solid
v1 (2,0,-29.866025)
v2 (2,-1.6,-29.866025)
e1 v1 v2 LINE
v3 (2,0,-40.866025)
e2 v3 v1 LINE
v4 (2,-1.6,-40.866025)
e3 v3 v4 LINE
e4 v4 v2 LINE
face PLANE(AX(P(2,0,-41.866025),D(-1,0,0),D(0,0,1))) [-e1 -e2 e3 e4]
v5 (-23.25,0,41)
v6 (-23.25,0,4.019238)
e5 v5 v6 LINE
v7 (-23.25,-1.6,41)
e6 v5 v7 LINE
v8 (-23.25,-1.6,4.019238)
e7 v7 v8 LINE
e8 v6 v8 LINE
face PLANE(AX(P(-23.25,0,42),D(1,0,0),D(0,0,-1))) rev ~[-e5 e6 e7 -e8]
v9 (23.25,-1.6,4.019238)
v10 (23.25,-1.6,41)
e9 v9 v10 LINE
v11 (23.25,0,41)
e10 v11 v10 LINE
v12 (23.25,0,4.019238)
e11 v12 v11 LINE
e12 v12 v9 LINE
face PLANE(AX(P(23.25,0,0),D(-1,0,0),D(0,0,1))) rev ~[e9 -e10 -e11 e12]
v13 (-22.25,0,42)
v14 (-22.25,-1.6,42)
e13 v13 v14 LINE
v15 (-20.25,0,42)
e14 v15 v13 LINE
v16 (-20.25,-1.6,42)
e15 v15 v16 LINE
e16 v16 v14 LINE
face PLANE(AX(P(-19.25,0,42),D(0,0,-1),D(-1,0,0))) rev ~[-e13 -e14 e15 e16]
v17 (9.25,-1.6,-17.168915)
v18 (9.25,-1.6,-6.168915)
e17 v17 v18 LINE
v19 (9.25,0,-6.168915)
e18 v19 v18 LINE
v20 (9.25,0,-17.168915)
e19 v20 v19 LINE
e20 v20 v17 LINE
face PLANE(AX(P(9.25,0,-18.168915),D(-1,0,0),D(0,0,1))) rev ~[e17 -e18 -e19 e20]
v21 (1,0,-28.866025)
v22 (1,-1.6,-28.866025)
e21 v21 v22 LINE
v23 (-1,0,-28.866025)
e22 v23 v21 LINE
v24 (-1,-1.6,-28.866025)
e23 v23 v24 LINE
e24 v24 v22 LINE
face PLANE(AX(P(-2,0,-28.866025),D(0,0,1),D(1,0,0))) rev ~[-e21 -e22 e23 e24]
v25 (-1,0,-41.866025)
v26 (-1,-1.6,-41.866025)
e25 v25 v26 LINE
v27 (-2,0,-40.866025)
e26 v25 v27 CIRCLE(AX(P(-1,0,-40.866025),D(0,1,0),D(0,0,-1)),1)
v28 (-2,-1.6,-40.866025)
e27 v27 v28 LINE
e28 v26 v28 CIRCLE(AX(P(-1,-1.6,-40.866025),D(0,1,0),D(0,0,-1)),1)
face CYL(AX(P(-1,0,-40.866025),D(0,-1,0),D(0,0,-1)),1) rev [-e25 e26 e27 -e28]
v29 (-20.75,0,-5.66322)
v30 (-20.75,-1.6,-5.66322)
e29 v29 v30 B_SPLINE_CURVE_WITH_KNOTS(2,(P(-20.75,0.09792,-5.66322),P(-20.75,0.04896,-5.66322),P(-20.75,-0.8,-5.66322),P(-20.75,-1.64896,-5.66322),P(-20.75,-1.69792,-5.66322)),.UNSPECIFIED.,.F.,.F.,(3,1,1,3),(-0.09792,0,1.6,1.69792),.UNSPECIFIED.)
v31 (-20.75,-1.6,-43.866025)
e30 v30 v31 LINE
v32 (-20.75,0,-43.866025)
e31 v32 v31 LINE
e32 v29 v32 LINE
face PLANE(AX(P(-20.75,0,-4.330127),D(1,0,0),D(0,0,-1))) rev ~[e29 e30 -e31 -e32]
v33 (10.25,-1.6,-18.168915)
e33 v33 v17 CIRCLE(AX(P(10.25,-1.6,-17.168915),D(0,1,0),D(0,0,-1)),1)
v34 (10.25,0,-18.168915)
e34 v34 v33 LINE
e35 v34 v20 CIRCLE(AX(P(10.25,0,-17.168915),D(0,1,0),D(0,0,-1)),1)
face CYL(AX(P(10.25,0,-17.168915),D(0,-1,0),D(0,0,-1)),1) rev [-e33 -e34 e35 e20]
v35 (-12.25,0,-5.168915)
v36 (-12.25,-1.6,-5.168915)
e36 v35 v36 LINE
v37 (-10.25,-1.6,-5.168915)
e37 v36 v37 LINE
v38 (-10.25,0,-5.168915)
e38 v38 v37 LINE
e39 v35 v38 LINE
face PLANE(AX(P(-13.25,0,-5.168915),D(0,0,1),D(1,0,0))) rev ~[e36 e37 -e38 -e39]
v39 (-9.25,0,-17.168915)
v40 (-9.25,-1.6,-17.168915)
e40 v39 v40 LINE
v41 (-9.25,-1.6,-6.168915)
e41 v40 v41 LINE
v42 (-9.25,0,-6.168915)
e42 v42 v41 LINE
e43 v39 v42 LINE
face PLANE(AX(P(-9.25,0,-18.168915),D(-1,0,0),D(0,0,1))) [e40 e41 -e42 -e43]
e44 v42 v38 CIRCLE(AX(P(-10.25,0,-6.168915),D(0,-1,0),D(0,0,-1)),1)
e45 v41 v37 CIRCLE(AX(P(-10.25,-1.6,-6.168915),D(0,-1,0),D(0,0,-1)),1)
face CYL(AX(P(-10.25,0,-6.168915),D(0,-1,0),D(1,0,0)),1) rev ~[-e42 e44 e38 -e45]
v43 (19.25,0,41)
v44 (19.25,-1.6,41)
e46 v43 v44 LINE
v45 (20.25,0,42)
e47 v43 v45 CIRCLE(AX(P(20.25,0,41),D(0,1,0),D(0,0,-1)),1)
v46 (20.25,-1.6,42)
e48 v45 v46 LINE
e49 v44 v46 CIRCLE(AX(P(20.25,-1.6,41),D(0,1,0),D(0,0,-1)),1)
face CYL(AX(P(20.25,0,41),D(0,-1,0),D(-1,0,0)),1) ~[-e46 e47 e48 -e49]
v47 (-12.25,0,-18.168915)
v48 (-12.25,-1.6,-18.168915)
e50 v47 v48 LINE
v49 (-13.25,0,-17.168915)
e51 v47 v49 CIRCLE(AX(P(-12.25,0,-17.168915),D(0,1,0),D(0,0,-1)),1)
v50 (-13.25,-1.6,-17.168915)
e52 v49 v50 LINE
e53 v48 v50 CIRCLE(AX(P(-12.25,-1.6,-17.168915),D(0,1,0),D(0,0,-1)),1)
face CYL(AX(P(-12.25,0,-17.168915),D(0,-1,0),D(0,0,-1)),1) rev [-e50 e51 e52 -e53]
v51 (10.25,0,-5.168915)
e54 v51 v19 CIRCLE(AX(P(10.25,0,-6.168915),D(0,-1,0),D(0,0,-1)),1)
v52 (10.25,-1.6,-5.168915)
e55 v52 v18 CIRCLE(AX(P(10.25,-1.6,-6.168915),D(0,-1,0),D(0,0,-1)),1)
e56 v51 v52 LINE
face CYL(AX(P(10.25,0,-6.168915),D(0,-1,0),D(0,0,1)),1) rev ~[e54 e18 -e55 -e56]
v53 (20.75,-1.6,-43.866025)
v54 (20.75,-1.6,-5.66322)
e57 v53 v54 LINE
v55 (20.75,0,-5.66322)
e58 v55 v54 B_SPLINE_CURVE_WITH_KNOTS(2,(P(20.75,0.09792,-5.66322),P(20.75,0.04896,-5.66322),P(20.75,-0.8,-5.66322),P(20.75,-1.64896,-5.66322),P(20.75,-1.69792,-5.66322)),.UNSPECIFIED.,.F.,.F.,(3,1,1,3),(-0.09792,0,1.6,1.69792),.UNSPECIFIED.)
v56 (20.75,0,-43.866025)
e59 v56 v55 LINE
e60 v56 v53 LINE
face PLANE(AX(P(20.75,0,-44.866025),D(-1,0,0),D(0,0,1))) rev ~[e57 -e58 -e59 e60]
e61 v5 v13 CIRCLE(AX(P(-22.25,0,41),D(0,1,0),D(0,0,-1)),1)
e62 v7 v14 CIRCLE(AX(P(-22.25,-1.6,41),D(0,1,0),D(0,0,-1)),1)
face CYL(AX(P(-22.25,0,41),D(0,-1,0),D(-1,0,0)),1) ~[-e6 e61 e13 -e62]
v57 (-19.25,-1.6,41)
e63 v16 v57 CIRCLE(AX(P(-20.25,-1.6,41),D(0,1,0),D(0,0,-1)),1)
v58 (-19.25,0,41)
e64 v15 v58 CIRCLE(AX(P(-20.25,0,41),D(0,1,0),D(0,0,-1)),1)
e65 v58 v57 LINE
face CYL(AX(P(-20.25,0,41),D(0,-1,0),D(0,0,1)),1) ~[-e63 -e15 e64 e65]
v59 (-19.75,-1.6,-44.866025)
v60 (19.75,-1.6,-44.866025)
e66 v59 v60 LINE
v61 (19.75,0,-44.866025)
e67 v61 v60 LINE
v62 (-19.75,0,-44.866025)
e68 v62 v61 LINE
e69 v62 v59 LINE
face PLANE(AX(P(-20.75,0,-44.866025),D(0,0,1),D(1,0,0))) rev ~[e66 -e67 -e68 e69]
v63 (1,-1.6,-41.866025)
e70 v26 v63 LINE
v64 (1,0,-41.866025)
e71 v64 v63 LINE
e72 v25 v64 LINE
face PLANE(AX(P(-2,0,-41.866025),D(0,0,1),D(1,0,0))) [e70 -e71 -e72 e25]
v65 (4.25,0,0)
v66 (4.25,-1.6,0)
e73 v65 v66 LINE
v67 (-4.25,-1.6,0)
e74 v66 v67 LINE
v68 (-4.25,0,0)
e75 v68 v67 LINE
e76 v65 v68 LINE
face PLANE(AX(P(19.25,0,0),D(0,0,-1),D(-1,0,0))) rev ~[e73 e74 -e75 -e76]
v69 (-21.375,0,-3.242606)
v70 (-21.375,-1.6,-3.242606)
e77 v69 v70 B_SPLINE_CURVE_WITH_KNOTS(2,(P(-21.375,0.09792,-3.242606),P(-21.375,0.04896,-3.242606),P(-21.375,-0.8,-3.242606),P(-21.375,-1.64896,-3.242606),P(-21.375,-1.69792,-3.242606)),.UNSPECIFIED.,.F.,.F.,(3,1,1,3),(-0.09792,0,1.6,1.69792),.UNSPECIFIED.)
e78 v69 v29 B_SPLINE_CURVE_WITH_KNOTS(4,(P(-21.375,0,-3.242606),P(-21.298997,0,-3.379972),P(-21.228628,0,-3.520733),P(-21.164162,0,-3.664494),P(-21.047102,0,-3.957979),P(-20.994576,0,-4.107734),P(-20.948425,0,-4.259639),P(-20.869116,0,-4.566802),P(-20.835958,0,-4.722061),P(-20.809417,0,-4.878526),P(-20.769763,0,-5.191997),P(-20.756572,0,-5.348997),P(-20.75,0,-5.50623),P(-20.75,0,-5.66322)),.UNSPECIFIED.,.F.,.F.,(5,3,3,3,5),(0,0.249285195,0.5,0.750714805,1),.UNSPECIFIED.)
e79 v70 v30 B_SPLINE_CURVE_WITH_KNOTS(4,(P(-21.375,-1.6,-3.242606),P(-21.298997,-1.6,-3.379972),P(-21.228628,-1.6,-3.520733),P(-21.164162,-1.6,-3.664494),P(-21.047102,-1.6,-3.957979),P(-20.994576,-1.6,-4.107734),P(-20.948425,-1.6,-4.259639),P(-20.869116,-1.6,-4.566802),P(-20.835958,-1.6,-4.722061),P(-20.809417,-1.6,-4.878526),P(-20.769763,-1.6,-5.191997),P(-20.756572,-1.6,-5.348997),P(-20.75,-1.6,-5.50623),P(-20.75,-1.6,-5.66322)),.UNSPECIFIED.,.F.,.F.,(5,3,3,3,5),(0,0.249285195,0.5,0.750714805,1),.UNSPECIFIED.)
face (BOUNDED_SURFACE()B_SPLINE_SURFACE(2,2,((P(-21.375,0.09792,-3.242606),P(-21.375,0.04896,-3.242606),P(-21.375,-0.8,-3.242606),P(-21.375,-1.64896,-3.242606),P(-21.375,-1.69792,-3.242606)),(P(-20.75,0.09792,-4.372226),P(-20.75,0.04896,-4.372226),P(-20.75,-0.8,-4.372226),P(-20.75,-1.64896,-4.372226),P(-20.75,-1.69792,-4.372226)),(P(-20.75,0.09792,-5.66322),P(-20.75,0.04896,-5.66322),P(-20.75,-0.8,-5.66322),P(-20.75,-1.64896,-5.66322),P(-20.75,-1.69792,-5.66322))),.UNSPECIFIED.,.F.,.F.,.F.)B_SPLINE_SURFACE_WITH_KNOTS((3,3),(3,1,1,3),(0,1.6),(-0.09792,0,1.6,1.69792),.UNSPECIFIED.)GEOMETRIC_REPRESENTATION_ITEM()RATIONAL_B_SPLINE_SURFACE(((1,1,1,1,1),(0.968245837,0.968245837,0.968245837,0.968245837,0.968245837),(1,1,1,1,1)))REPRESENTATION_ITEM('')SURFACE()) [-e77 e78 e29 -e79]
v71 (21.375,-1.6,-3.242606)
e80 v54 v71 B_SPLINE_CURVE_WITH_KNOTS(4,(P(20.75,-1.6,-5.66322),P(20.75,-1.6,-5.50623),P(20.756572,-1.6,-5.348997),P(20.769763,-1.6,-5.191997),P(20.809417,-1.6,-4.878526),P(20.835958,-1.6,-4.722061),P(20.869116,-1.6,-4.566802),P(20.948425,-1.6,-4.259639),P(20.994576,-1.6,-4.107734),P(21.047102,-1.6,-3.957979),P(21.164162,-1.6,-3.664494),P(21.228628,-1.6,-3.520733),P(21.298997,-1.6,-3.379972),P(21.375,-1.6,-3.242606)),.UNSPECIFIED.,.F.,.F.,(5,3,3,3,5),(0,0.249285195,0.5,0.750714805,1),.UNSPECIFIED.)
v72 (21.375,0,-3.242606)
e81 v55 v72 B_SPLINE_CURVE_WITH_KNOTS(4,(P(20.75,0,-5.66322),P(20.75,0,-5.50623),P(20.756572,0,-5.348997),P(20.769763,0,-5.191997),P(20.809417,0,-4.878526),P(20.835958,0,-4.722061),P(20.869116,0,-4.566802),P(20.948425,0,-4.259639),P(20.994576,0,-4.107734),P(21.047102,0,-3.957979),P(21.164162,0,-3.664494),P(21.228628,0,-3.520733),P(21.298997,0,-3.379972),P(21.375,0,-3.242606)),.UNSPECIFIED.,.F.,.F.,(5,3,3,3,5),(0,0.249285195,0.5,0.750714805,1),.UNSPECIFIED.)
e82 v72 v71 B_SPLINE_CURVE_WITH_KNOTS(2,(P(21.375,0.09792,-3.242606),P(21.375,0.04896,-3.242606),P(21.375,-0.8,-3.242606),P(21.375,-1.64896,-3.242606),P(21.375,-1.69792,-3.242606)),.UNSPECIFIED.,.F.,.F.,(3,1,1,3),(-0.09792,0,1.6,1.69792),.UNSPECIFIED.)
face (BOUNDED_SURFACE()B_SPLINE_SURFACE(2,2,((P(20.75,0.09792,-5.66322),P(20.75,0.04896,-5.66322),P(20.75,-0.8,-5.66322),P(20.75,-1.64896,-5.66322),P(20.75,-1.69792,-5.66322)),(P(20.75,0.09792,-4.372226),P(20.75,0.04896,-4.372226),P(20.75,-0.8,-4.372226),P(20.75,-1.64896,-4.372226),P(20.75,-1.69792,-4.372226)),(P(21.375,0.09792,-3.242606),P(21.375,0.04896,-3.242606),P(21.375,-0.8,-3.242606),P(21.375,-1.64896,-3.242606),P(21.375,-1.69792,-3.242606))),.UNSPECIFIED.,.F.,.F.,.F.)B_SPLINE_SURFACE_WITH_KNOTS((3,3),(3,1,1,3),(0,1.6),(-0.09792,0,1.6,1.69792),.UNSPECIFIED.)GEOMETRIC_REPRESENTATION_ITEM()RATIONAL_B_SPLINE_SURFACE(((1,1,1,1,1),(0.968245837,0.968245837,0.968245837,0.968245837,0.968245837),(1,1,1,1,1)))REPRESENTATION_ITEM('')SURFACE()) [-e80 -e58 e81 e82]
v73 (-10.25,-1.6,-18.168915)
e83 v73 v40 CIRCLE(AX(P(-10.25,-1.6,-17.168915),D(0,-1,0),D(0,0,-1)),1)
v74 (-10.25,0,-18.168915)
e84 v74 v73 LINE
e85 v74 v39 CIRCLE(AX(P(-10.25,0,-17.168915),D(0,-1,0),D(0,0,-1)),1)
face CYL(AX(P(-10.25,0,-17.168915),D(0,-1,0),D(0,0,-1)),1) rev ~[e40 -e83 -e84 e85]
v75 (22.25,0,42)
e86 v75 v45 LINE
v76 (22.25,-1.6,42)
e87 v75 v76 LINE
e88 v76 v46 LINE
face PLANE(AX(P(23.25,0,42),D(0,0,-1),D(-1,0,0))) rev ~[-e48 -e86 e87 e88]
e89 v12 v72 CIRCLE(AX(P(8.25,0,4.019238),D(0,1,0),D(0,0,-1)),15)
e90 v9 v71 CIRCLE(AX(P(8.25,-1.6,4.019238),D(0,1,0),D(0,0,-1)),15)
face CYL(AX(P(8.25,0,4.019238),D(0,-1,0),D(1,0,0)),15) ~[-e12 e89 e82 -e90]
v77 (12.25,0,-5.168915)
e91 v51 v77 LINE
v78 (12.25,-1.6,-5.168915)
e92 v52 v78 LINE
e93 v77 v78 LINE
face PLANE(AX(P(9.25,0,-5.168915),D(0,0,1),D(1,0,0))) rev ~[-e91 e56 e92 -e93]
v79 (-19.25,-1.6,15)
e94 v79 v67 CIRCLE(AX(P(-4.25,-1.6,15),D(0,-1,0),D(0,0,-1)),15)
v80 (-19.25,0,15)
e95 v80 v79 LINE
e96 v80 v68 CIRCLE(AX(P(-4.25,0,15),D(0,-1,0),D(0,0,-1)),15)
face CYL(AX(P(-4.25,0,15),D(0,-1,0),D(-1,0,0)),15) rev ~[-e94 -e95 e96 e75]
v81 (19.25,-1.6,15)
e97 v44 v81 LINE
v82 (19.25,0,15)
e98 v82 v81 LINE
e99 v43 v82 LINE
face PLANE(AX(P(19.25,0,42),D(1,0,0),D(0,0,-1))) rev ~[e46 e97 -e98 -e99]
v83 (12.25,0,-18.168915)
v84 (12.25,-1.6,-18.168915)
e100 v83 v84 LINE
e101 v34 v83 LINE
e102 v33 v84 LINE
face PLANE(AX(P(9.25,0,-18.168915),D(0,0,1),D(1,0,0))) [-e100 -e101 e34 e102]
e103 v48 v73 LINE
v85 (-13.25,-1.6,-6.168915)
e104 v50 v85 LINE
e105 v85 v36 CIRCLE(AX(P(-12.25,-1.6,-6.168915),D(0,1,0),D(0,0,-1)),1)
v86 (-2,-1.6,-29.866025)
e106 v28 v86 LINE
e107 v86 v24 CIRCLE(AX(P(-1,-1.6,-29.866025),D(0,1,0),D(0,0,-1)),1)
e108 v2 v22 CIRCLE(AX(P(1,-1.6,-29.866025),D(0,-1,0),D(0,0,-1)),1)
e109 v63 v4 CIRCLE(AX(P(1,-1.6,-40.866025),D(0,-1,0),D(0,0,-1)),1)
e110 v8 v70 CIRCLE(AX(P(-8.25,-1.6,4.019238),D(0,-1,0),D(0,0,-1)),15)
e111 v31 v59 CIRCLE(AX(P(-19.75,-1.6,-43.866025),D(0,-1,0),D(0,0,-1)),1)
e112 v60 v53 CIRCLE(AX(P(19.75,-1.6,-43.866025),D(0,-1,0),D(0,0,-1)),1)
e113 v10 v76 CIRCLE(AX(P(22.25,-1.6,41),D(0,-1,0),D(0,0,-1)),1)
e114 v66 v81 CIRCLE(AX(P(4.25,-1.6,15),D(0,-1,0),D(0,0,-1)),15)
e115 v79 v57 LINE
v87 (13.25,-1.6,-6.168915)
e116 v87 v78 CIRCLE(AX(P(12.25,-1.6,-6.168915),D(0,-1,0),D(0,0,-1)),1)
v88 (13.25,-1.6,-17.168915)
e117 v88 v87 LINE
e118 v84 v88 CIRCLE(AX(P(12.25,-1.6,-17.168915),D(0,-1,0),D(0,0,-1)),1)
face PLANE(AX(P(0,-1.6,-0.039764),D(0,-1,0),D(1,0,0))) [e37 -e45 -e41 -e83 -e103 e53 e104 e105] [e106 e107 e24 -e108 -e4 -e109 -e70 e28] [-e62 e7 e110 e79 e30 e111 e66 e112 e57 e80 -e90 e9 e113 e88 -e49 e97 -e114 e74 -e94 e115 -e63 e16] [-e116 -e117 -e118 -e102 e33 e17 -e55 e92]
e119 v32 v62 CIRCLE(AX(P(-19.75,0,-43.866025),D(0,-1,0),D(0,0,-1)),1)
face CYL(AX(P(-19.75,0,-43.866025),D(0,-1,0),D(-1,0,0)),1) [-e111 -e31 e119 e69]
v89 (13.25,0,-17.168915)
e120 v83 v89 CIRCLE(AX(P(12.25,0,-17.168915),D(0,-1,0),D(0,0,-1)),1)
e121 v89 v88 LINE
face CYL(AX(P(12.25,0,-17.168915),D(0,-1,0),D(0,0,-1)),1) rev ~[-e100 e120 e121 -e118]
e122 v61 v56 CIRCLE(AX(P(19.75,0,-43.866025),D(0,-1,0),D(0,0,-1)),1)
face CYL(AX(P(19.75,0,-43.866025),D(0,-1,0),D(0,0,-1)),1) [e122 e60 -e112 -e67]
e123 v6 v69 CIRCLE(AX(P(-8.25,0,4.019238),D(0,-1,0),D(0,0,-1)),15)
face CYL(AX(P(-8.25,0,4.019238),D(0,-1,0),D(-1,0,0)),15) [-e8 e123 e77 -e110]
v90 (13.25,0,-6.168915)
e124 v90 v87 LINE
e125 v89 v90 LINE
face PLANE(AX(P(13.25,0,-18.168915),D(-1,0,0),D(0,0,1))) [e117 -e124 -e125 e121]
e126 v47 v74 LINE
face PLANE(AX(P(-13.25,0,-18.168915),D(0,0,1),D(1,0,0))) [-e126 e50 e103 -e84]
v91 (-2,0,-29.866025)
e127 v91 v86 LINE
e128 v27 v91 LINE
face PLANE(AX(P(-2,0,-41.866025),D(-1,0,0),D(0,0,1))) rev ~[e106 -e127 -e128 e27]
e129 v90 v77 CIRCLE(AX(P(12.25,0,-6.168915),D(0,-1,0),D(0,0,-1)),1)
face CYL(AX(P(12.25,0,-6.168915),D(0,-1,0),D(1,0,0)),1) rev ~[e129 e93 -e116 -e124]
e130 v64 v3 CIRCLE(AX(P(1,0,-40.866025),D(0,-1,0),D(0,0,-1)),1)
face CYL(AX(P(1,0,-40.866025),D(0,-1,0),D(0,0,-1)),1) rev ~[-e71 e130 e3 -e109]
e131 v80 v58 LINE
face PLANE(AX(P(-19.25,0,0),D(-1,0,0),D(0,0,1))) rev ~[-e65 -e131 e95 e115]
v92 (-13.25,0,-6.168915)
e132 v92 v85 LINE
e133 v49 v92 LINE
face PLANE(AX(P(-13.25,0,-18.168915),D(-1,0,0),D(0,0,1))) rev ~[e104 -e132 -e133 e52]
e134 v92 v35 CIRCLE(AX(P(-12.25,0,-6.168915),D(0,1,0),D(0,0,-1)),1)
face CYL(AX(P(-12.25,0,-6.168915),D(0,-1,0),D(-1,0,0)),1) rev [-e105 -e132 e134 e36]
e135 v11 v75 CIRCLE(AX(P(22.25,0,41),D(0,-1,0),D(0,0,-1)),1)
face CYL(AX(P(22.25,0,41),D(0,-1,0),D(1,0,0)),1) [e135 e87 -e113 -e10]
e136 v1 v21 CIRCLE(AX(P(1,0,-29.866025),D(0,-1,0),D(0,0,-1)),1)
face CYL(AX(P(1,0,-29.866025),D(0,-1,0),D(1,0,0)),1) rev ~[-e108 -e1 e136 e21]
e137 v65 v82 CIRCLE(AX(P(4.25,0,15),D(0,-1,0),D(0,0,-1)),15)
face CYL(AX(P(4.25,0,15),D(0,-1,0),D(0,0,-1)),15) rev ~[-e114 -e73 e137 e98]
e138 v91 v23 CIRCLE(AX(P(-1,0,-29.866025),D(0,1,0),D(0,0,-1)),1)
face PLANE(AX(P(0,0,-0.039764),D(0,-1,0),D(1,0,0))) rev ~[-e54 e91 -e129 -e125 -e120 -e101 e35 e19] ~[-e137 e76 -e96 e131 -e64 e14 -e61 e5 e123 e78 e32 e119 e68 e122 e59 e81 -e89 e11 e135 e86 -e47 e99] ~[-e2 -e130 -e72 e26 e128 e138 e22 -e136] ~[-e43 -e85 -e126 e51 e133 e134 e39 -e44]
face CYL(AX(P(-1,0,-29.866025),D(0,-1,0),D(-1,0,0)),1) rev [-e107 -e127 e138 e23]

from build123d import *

# Parameters (mm, degrees)
F0_W     = 4
F0_H     = 13
F1_DEPTH = 1.6
F2_R     = 15
F3_R     = 5
F4_R     = 1


# Not quite as in the source:
# - a feature names something its author has since deleted; it is built from what else it names


with BuildPart() as f1:
    # F0 (on Front) → F1 (new body)
    with BuildSketch(Plane.XZ):
        Polygon((-19.25, 42), (-23.25, 42), (-23.25, 0), (-20.75, -4.3301270189), (-20.75, -44.8660254038), (20.75, -44.8660254038), (20.75, -4.3301270189), (23.25, 0), (23.25, 42), (19.25, 42), (19.25, 0), (-19.25, 0), align=None)
        with Locations((-11.25, -11.6689147807)):
            Rectangle(F0_W, F0_H, mode=Mode.SUBTRACT)
        with Locations((0, -35.3660254038)):
            Rectangle(F0_W, F0_H, mode=Mode.SUBTRACT)
        with Locations((11.25, -11.6689147807)):
            Rectangle(F0_W, F0_H, mode=Mode.SUBTRACT)
    extrude(amount=F1_DEPTH)

    # F2
    f2_edges = [f1.edges().sort_by_distance(p)[0] for p in [
        (-19.25, -0.8, 0),
        (19.25, -0.8, 0),
        (23.25, -0.8, 0),
        (-23.25, -0.8, 0),
    ]]
    fillet(f2_edges, radius=F2_R)

    # F3
    f3_edges = [f1.edges().sort_by_distance(p)[0] for p in [
        (-20.75, -0.8, -4.330127),
        (20.75, -0.8, -4.330127),
    ]]
    fillet(f3_edges, radius=F3_R)

    # F4
    f4_edges = [f1.edges().sort_by_distance(p)[0] for p in [
        (-13.25, -0.8, -5.168915),
        (-13.25, -0.8, -18.168915),
        (-9.25, -0.8, -5.168915),
        (-9.25, -0.8, -18.168915),
        (13.25, -0.8, -18.168915),
        (13.25, -0.8, -5.168915),
        (9.25, -0.8, -5.168915),
        (9.25, -0.8, -18.168915),
        (-2, -0.8, -41.866025),
        (-2, -0.8, -28.866025),
        (2, -0.8, -28.866025),
        (2, -0.8, -41.866025),
        (20.75, -0.8, -44.866025),
        (-20.75, -0.8, -44.866025),
        (-19.25, -0.8, 42),
        (-23.25, -0.8, 42),
        (19.25, -0.8, 42),
        (23.25, -0.8, 42),
    ]]
    fillet(f4_edges, radius=F4_R)


solid = f1.part
